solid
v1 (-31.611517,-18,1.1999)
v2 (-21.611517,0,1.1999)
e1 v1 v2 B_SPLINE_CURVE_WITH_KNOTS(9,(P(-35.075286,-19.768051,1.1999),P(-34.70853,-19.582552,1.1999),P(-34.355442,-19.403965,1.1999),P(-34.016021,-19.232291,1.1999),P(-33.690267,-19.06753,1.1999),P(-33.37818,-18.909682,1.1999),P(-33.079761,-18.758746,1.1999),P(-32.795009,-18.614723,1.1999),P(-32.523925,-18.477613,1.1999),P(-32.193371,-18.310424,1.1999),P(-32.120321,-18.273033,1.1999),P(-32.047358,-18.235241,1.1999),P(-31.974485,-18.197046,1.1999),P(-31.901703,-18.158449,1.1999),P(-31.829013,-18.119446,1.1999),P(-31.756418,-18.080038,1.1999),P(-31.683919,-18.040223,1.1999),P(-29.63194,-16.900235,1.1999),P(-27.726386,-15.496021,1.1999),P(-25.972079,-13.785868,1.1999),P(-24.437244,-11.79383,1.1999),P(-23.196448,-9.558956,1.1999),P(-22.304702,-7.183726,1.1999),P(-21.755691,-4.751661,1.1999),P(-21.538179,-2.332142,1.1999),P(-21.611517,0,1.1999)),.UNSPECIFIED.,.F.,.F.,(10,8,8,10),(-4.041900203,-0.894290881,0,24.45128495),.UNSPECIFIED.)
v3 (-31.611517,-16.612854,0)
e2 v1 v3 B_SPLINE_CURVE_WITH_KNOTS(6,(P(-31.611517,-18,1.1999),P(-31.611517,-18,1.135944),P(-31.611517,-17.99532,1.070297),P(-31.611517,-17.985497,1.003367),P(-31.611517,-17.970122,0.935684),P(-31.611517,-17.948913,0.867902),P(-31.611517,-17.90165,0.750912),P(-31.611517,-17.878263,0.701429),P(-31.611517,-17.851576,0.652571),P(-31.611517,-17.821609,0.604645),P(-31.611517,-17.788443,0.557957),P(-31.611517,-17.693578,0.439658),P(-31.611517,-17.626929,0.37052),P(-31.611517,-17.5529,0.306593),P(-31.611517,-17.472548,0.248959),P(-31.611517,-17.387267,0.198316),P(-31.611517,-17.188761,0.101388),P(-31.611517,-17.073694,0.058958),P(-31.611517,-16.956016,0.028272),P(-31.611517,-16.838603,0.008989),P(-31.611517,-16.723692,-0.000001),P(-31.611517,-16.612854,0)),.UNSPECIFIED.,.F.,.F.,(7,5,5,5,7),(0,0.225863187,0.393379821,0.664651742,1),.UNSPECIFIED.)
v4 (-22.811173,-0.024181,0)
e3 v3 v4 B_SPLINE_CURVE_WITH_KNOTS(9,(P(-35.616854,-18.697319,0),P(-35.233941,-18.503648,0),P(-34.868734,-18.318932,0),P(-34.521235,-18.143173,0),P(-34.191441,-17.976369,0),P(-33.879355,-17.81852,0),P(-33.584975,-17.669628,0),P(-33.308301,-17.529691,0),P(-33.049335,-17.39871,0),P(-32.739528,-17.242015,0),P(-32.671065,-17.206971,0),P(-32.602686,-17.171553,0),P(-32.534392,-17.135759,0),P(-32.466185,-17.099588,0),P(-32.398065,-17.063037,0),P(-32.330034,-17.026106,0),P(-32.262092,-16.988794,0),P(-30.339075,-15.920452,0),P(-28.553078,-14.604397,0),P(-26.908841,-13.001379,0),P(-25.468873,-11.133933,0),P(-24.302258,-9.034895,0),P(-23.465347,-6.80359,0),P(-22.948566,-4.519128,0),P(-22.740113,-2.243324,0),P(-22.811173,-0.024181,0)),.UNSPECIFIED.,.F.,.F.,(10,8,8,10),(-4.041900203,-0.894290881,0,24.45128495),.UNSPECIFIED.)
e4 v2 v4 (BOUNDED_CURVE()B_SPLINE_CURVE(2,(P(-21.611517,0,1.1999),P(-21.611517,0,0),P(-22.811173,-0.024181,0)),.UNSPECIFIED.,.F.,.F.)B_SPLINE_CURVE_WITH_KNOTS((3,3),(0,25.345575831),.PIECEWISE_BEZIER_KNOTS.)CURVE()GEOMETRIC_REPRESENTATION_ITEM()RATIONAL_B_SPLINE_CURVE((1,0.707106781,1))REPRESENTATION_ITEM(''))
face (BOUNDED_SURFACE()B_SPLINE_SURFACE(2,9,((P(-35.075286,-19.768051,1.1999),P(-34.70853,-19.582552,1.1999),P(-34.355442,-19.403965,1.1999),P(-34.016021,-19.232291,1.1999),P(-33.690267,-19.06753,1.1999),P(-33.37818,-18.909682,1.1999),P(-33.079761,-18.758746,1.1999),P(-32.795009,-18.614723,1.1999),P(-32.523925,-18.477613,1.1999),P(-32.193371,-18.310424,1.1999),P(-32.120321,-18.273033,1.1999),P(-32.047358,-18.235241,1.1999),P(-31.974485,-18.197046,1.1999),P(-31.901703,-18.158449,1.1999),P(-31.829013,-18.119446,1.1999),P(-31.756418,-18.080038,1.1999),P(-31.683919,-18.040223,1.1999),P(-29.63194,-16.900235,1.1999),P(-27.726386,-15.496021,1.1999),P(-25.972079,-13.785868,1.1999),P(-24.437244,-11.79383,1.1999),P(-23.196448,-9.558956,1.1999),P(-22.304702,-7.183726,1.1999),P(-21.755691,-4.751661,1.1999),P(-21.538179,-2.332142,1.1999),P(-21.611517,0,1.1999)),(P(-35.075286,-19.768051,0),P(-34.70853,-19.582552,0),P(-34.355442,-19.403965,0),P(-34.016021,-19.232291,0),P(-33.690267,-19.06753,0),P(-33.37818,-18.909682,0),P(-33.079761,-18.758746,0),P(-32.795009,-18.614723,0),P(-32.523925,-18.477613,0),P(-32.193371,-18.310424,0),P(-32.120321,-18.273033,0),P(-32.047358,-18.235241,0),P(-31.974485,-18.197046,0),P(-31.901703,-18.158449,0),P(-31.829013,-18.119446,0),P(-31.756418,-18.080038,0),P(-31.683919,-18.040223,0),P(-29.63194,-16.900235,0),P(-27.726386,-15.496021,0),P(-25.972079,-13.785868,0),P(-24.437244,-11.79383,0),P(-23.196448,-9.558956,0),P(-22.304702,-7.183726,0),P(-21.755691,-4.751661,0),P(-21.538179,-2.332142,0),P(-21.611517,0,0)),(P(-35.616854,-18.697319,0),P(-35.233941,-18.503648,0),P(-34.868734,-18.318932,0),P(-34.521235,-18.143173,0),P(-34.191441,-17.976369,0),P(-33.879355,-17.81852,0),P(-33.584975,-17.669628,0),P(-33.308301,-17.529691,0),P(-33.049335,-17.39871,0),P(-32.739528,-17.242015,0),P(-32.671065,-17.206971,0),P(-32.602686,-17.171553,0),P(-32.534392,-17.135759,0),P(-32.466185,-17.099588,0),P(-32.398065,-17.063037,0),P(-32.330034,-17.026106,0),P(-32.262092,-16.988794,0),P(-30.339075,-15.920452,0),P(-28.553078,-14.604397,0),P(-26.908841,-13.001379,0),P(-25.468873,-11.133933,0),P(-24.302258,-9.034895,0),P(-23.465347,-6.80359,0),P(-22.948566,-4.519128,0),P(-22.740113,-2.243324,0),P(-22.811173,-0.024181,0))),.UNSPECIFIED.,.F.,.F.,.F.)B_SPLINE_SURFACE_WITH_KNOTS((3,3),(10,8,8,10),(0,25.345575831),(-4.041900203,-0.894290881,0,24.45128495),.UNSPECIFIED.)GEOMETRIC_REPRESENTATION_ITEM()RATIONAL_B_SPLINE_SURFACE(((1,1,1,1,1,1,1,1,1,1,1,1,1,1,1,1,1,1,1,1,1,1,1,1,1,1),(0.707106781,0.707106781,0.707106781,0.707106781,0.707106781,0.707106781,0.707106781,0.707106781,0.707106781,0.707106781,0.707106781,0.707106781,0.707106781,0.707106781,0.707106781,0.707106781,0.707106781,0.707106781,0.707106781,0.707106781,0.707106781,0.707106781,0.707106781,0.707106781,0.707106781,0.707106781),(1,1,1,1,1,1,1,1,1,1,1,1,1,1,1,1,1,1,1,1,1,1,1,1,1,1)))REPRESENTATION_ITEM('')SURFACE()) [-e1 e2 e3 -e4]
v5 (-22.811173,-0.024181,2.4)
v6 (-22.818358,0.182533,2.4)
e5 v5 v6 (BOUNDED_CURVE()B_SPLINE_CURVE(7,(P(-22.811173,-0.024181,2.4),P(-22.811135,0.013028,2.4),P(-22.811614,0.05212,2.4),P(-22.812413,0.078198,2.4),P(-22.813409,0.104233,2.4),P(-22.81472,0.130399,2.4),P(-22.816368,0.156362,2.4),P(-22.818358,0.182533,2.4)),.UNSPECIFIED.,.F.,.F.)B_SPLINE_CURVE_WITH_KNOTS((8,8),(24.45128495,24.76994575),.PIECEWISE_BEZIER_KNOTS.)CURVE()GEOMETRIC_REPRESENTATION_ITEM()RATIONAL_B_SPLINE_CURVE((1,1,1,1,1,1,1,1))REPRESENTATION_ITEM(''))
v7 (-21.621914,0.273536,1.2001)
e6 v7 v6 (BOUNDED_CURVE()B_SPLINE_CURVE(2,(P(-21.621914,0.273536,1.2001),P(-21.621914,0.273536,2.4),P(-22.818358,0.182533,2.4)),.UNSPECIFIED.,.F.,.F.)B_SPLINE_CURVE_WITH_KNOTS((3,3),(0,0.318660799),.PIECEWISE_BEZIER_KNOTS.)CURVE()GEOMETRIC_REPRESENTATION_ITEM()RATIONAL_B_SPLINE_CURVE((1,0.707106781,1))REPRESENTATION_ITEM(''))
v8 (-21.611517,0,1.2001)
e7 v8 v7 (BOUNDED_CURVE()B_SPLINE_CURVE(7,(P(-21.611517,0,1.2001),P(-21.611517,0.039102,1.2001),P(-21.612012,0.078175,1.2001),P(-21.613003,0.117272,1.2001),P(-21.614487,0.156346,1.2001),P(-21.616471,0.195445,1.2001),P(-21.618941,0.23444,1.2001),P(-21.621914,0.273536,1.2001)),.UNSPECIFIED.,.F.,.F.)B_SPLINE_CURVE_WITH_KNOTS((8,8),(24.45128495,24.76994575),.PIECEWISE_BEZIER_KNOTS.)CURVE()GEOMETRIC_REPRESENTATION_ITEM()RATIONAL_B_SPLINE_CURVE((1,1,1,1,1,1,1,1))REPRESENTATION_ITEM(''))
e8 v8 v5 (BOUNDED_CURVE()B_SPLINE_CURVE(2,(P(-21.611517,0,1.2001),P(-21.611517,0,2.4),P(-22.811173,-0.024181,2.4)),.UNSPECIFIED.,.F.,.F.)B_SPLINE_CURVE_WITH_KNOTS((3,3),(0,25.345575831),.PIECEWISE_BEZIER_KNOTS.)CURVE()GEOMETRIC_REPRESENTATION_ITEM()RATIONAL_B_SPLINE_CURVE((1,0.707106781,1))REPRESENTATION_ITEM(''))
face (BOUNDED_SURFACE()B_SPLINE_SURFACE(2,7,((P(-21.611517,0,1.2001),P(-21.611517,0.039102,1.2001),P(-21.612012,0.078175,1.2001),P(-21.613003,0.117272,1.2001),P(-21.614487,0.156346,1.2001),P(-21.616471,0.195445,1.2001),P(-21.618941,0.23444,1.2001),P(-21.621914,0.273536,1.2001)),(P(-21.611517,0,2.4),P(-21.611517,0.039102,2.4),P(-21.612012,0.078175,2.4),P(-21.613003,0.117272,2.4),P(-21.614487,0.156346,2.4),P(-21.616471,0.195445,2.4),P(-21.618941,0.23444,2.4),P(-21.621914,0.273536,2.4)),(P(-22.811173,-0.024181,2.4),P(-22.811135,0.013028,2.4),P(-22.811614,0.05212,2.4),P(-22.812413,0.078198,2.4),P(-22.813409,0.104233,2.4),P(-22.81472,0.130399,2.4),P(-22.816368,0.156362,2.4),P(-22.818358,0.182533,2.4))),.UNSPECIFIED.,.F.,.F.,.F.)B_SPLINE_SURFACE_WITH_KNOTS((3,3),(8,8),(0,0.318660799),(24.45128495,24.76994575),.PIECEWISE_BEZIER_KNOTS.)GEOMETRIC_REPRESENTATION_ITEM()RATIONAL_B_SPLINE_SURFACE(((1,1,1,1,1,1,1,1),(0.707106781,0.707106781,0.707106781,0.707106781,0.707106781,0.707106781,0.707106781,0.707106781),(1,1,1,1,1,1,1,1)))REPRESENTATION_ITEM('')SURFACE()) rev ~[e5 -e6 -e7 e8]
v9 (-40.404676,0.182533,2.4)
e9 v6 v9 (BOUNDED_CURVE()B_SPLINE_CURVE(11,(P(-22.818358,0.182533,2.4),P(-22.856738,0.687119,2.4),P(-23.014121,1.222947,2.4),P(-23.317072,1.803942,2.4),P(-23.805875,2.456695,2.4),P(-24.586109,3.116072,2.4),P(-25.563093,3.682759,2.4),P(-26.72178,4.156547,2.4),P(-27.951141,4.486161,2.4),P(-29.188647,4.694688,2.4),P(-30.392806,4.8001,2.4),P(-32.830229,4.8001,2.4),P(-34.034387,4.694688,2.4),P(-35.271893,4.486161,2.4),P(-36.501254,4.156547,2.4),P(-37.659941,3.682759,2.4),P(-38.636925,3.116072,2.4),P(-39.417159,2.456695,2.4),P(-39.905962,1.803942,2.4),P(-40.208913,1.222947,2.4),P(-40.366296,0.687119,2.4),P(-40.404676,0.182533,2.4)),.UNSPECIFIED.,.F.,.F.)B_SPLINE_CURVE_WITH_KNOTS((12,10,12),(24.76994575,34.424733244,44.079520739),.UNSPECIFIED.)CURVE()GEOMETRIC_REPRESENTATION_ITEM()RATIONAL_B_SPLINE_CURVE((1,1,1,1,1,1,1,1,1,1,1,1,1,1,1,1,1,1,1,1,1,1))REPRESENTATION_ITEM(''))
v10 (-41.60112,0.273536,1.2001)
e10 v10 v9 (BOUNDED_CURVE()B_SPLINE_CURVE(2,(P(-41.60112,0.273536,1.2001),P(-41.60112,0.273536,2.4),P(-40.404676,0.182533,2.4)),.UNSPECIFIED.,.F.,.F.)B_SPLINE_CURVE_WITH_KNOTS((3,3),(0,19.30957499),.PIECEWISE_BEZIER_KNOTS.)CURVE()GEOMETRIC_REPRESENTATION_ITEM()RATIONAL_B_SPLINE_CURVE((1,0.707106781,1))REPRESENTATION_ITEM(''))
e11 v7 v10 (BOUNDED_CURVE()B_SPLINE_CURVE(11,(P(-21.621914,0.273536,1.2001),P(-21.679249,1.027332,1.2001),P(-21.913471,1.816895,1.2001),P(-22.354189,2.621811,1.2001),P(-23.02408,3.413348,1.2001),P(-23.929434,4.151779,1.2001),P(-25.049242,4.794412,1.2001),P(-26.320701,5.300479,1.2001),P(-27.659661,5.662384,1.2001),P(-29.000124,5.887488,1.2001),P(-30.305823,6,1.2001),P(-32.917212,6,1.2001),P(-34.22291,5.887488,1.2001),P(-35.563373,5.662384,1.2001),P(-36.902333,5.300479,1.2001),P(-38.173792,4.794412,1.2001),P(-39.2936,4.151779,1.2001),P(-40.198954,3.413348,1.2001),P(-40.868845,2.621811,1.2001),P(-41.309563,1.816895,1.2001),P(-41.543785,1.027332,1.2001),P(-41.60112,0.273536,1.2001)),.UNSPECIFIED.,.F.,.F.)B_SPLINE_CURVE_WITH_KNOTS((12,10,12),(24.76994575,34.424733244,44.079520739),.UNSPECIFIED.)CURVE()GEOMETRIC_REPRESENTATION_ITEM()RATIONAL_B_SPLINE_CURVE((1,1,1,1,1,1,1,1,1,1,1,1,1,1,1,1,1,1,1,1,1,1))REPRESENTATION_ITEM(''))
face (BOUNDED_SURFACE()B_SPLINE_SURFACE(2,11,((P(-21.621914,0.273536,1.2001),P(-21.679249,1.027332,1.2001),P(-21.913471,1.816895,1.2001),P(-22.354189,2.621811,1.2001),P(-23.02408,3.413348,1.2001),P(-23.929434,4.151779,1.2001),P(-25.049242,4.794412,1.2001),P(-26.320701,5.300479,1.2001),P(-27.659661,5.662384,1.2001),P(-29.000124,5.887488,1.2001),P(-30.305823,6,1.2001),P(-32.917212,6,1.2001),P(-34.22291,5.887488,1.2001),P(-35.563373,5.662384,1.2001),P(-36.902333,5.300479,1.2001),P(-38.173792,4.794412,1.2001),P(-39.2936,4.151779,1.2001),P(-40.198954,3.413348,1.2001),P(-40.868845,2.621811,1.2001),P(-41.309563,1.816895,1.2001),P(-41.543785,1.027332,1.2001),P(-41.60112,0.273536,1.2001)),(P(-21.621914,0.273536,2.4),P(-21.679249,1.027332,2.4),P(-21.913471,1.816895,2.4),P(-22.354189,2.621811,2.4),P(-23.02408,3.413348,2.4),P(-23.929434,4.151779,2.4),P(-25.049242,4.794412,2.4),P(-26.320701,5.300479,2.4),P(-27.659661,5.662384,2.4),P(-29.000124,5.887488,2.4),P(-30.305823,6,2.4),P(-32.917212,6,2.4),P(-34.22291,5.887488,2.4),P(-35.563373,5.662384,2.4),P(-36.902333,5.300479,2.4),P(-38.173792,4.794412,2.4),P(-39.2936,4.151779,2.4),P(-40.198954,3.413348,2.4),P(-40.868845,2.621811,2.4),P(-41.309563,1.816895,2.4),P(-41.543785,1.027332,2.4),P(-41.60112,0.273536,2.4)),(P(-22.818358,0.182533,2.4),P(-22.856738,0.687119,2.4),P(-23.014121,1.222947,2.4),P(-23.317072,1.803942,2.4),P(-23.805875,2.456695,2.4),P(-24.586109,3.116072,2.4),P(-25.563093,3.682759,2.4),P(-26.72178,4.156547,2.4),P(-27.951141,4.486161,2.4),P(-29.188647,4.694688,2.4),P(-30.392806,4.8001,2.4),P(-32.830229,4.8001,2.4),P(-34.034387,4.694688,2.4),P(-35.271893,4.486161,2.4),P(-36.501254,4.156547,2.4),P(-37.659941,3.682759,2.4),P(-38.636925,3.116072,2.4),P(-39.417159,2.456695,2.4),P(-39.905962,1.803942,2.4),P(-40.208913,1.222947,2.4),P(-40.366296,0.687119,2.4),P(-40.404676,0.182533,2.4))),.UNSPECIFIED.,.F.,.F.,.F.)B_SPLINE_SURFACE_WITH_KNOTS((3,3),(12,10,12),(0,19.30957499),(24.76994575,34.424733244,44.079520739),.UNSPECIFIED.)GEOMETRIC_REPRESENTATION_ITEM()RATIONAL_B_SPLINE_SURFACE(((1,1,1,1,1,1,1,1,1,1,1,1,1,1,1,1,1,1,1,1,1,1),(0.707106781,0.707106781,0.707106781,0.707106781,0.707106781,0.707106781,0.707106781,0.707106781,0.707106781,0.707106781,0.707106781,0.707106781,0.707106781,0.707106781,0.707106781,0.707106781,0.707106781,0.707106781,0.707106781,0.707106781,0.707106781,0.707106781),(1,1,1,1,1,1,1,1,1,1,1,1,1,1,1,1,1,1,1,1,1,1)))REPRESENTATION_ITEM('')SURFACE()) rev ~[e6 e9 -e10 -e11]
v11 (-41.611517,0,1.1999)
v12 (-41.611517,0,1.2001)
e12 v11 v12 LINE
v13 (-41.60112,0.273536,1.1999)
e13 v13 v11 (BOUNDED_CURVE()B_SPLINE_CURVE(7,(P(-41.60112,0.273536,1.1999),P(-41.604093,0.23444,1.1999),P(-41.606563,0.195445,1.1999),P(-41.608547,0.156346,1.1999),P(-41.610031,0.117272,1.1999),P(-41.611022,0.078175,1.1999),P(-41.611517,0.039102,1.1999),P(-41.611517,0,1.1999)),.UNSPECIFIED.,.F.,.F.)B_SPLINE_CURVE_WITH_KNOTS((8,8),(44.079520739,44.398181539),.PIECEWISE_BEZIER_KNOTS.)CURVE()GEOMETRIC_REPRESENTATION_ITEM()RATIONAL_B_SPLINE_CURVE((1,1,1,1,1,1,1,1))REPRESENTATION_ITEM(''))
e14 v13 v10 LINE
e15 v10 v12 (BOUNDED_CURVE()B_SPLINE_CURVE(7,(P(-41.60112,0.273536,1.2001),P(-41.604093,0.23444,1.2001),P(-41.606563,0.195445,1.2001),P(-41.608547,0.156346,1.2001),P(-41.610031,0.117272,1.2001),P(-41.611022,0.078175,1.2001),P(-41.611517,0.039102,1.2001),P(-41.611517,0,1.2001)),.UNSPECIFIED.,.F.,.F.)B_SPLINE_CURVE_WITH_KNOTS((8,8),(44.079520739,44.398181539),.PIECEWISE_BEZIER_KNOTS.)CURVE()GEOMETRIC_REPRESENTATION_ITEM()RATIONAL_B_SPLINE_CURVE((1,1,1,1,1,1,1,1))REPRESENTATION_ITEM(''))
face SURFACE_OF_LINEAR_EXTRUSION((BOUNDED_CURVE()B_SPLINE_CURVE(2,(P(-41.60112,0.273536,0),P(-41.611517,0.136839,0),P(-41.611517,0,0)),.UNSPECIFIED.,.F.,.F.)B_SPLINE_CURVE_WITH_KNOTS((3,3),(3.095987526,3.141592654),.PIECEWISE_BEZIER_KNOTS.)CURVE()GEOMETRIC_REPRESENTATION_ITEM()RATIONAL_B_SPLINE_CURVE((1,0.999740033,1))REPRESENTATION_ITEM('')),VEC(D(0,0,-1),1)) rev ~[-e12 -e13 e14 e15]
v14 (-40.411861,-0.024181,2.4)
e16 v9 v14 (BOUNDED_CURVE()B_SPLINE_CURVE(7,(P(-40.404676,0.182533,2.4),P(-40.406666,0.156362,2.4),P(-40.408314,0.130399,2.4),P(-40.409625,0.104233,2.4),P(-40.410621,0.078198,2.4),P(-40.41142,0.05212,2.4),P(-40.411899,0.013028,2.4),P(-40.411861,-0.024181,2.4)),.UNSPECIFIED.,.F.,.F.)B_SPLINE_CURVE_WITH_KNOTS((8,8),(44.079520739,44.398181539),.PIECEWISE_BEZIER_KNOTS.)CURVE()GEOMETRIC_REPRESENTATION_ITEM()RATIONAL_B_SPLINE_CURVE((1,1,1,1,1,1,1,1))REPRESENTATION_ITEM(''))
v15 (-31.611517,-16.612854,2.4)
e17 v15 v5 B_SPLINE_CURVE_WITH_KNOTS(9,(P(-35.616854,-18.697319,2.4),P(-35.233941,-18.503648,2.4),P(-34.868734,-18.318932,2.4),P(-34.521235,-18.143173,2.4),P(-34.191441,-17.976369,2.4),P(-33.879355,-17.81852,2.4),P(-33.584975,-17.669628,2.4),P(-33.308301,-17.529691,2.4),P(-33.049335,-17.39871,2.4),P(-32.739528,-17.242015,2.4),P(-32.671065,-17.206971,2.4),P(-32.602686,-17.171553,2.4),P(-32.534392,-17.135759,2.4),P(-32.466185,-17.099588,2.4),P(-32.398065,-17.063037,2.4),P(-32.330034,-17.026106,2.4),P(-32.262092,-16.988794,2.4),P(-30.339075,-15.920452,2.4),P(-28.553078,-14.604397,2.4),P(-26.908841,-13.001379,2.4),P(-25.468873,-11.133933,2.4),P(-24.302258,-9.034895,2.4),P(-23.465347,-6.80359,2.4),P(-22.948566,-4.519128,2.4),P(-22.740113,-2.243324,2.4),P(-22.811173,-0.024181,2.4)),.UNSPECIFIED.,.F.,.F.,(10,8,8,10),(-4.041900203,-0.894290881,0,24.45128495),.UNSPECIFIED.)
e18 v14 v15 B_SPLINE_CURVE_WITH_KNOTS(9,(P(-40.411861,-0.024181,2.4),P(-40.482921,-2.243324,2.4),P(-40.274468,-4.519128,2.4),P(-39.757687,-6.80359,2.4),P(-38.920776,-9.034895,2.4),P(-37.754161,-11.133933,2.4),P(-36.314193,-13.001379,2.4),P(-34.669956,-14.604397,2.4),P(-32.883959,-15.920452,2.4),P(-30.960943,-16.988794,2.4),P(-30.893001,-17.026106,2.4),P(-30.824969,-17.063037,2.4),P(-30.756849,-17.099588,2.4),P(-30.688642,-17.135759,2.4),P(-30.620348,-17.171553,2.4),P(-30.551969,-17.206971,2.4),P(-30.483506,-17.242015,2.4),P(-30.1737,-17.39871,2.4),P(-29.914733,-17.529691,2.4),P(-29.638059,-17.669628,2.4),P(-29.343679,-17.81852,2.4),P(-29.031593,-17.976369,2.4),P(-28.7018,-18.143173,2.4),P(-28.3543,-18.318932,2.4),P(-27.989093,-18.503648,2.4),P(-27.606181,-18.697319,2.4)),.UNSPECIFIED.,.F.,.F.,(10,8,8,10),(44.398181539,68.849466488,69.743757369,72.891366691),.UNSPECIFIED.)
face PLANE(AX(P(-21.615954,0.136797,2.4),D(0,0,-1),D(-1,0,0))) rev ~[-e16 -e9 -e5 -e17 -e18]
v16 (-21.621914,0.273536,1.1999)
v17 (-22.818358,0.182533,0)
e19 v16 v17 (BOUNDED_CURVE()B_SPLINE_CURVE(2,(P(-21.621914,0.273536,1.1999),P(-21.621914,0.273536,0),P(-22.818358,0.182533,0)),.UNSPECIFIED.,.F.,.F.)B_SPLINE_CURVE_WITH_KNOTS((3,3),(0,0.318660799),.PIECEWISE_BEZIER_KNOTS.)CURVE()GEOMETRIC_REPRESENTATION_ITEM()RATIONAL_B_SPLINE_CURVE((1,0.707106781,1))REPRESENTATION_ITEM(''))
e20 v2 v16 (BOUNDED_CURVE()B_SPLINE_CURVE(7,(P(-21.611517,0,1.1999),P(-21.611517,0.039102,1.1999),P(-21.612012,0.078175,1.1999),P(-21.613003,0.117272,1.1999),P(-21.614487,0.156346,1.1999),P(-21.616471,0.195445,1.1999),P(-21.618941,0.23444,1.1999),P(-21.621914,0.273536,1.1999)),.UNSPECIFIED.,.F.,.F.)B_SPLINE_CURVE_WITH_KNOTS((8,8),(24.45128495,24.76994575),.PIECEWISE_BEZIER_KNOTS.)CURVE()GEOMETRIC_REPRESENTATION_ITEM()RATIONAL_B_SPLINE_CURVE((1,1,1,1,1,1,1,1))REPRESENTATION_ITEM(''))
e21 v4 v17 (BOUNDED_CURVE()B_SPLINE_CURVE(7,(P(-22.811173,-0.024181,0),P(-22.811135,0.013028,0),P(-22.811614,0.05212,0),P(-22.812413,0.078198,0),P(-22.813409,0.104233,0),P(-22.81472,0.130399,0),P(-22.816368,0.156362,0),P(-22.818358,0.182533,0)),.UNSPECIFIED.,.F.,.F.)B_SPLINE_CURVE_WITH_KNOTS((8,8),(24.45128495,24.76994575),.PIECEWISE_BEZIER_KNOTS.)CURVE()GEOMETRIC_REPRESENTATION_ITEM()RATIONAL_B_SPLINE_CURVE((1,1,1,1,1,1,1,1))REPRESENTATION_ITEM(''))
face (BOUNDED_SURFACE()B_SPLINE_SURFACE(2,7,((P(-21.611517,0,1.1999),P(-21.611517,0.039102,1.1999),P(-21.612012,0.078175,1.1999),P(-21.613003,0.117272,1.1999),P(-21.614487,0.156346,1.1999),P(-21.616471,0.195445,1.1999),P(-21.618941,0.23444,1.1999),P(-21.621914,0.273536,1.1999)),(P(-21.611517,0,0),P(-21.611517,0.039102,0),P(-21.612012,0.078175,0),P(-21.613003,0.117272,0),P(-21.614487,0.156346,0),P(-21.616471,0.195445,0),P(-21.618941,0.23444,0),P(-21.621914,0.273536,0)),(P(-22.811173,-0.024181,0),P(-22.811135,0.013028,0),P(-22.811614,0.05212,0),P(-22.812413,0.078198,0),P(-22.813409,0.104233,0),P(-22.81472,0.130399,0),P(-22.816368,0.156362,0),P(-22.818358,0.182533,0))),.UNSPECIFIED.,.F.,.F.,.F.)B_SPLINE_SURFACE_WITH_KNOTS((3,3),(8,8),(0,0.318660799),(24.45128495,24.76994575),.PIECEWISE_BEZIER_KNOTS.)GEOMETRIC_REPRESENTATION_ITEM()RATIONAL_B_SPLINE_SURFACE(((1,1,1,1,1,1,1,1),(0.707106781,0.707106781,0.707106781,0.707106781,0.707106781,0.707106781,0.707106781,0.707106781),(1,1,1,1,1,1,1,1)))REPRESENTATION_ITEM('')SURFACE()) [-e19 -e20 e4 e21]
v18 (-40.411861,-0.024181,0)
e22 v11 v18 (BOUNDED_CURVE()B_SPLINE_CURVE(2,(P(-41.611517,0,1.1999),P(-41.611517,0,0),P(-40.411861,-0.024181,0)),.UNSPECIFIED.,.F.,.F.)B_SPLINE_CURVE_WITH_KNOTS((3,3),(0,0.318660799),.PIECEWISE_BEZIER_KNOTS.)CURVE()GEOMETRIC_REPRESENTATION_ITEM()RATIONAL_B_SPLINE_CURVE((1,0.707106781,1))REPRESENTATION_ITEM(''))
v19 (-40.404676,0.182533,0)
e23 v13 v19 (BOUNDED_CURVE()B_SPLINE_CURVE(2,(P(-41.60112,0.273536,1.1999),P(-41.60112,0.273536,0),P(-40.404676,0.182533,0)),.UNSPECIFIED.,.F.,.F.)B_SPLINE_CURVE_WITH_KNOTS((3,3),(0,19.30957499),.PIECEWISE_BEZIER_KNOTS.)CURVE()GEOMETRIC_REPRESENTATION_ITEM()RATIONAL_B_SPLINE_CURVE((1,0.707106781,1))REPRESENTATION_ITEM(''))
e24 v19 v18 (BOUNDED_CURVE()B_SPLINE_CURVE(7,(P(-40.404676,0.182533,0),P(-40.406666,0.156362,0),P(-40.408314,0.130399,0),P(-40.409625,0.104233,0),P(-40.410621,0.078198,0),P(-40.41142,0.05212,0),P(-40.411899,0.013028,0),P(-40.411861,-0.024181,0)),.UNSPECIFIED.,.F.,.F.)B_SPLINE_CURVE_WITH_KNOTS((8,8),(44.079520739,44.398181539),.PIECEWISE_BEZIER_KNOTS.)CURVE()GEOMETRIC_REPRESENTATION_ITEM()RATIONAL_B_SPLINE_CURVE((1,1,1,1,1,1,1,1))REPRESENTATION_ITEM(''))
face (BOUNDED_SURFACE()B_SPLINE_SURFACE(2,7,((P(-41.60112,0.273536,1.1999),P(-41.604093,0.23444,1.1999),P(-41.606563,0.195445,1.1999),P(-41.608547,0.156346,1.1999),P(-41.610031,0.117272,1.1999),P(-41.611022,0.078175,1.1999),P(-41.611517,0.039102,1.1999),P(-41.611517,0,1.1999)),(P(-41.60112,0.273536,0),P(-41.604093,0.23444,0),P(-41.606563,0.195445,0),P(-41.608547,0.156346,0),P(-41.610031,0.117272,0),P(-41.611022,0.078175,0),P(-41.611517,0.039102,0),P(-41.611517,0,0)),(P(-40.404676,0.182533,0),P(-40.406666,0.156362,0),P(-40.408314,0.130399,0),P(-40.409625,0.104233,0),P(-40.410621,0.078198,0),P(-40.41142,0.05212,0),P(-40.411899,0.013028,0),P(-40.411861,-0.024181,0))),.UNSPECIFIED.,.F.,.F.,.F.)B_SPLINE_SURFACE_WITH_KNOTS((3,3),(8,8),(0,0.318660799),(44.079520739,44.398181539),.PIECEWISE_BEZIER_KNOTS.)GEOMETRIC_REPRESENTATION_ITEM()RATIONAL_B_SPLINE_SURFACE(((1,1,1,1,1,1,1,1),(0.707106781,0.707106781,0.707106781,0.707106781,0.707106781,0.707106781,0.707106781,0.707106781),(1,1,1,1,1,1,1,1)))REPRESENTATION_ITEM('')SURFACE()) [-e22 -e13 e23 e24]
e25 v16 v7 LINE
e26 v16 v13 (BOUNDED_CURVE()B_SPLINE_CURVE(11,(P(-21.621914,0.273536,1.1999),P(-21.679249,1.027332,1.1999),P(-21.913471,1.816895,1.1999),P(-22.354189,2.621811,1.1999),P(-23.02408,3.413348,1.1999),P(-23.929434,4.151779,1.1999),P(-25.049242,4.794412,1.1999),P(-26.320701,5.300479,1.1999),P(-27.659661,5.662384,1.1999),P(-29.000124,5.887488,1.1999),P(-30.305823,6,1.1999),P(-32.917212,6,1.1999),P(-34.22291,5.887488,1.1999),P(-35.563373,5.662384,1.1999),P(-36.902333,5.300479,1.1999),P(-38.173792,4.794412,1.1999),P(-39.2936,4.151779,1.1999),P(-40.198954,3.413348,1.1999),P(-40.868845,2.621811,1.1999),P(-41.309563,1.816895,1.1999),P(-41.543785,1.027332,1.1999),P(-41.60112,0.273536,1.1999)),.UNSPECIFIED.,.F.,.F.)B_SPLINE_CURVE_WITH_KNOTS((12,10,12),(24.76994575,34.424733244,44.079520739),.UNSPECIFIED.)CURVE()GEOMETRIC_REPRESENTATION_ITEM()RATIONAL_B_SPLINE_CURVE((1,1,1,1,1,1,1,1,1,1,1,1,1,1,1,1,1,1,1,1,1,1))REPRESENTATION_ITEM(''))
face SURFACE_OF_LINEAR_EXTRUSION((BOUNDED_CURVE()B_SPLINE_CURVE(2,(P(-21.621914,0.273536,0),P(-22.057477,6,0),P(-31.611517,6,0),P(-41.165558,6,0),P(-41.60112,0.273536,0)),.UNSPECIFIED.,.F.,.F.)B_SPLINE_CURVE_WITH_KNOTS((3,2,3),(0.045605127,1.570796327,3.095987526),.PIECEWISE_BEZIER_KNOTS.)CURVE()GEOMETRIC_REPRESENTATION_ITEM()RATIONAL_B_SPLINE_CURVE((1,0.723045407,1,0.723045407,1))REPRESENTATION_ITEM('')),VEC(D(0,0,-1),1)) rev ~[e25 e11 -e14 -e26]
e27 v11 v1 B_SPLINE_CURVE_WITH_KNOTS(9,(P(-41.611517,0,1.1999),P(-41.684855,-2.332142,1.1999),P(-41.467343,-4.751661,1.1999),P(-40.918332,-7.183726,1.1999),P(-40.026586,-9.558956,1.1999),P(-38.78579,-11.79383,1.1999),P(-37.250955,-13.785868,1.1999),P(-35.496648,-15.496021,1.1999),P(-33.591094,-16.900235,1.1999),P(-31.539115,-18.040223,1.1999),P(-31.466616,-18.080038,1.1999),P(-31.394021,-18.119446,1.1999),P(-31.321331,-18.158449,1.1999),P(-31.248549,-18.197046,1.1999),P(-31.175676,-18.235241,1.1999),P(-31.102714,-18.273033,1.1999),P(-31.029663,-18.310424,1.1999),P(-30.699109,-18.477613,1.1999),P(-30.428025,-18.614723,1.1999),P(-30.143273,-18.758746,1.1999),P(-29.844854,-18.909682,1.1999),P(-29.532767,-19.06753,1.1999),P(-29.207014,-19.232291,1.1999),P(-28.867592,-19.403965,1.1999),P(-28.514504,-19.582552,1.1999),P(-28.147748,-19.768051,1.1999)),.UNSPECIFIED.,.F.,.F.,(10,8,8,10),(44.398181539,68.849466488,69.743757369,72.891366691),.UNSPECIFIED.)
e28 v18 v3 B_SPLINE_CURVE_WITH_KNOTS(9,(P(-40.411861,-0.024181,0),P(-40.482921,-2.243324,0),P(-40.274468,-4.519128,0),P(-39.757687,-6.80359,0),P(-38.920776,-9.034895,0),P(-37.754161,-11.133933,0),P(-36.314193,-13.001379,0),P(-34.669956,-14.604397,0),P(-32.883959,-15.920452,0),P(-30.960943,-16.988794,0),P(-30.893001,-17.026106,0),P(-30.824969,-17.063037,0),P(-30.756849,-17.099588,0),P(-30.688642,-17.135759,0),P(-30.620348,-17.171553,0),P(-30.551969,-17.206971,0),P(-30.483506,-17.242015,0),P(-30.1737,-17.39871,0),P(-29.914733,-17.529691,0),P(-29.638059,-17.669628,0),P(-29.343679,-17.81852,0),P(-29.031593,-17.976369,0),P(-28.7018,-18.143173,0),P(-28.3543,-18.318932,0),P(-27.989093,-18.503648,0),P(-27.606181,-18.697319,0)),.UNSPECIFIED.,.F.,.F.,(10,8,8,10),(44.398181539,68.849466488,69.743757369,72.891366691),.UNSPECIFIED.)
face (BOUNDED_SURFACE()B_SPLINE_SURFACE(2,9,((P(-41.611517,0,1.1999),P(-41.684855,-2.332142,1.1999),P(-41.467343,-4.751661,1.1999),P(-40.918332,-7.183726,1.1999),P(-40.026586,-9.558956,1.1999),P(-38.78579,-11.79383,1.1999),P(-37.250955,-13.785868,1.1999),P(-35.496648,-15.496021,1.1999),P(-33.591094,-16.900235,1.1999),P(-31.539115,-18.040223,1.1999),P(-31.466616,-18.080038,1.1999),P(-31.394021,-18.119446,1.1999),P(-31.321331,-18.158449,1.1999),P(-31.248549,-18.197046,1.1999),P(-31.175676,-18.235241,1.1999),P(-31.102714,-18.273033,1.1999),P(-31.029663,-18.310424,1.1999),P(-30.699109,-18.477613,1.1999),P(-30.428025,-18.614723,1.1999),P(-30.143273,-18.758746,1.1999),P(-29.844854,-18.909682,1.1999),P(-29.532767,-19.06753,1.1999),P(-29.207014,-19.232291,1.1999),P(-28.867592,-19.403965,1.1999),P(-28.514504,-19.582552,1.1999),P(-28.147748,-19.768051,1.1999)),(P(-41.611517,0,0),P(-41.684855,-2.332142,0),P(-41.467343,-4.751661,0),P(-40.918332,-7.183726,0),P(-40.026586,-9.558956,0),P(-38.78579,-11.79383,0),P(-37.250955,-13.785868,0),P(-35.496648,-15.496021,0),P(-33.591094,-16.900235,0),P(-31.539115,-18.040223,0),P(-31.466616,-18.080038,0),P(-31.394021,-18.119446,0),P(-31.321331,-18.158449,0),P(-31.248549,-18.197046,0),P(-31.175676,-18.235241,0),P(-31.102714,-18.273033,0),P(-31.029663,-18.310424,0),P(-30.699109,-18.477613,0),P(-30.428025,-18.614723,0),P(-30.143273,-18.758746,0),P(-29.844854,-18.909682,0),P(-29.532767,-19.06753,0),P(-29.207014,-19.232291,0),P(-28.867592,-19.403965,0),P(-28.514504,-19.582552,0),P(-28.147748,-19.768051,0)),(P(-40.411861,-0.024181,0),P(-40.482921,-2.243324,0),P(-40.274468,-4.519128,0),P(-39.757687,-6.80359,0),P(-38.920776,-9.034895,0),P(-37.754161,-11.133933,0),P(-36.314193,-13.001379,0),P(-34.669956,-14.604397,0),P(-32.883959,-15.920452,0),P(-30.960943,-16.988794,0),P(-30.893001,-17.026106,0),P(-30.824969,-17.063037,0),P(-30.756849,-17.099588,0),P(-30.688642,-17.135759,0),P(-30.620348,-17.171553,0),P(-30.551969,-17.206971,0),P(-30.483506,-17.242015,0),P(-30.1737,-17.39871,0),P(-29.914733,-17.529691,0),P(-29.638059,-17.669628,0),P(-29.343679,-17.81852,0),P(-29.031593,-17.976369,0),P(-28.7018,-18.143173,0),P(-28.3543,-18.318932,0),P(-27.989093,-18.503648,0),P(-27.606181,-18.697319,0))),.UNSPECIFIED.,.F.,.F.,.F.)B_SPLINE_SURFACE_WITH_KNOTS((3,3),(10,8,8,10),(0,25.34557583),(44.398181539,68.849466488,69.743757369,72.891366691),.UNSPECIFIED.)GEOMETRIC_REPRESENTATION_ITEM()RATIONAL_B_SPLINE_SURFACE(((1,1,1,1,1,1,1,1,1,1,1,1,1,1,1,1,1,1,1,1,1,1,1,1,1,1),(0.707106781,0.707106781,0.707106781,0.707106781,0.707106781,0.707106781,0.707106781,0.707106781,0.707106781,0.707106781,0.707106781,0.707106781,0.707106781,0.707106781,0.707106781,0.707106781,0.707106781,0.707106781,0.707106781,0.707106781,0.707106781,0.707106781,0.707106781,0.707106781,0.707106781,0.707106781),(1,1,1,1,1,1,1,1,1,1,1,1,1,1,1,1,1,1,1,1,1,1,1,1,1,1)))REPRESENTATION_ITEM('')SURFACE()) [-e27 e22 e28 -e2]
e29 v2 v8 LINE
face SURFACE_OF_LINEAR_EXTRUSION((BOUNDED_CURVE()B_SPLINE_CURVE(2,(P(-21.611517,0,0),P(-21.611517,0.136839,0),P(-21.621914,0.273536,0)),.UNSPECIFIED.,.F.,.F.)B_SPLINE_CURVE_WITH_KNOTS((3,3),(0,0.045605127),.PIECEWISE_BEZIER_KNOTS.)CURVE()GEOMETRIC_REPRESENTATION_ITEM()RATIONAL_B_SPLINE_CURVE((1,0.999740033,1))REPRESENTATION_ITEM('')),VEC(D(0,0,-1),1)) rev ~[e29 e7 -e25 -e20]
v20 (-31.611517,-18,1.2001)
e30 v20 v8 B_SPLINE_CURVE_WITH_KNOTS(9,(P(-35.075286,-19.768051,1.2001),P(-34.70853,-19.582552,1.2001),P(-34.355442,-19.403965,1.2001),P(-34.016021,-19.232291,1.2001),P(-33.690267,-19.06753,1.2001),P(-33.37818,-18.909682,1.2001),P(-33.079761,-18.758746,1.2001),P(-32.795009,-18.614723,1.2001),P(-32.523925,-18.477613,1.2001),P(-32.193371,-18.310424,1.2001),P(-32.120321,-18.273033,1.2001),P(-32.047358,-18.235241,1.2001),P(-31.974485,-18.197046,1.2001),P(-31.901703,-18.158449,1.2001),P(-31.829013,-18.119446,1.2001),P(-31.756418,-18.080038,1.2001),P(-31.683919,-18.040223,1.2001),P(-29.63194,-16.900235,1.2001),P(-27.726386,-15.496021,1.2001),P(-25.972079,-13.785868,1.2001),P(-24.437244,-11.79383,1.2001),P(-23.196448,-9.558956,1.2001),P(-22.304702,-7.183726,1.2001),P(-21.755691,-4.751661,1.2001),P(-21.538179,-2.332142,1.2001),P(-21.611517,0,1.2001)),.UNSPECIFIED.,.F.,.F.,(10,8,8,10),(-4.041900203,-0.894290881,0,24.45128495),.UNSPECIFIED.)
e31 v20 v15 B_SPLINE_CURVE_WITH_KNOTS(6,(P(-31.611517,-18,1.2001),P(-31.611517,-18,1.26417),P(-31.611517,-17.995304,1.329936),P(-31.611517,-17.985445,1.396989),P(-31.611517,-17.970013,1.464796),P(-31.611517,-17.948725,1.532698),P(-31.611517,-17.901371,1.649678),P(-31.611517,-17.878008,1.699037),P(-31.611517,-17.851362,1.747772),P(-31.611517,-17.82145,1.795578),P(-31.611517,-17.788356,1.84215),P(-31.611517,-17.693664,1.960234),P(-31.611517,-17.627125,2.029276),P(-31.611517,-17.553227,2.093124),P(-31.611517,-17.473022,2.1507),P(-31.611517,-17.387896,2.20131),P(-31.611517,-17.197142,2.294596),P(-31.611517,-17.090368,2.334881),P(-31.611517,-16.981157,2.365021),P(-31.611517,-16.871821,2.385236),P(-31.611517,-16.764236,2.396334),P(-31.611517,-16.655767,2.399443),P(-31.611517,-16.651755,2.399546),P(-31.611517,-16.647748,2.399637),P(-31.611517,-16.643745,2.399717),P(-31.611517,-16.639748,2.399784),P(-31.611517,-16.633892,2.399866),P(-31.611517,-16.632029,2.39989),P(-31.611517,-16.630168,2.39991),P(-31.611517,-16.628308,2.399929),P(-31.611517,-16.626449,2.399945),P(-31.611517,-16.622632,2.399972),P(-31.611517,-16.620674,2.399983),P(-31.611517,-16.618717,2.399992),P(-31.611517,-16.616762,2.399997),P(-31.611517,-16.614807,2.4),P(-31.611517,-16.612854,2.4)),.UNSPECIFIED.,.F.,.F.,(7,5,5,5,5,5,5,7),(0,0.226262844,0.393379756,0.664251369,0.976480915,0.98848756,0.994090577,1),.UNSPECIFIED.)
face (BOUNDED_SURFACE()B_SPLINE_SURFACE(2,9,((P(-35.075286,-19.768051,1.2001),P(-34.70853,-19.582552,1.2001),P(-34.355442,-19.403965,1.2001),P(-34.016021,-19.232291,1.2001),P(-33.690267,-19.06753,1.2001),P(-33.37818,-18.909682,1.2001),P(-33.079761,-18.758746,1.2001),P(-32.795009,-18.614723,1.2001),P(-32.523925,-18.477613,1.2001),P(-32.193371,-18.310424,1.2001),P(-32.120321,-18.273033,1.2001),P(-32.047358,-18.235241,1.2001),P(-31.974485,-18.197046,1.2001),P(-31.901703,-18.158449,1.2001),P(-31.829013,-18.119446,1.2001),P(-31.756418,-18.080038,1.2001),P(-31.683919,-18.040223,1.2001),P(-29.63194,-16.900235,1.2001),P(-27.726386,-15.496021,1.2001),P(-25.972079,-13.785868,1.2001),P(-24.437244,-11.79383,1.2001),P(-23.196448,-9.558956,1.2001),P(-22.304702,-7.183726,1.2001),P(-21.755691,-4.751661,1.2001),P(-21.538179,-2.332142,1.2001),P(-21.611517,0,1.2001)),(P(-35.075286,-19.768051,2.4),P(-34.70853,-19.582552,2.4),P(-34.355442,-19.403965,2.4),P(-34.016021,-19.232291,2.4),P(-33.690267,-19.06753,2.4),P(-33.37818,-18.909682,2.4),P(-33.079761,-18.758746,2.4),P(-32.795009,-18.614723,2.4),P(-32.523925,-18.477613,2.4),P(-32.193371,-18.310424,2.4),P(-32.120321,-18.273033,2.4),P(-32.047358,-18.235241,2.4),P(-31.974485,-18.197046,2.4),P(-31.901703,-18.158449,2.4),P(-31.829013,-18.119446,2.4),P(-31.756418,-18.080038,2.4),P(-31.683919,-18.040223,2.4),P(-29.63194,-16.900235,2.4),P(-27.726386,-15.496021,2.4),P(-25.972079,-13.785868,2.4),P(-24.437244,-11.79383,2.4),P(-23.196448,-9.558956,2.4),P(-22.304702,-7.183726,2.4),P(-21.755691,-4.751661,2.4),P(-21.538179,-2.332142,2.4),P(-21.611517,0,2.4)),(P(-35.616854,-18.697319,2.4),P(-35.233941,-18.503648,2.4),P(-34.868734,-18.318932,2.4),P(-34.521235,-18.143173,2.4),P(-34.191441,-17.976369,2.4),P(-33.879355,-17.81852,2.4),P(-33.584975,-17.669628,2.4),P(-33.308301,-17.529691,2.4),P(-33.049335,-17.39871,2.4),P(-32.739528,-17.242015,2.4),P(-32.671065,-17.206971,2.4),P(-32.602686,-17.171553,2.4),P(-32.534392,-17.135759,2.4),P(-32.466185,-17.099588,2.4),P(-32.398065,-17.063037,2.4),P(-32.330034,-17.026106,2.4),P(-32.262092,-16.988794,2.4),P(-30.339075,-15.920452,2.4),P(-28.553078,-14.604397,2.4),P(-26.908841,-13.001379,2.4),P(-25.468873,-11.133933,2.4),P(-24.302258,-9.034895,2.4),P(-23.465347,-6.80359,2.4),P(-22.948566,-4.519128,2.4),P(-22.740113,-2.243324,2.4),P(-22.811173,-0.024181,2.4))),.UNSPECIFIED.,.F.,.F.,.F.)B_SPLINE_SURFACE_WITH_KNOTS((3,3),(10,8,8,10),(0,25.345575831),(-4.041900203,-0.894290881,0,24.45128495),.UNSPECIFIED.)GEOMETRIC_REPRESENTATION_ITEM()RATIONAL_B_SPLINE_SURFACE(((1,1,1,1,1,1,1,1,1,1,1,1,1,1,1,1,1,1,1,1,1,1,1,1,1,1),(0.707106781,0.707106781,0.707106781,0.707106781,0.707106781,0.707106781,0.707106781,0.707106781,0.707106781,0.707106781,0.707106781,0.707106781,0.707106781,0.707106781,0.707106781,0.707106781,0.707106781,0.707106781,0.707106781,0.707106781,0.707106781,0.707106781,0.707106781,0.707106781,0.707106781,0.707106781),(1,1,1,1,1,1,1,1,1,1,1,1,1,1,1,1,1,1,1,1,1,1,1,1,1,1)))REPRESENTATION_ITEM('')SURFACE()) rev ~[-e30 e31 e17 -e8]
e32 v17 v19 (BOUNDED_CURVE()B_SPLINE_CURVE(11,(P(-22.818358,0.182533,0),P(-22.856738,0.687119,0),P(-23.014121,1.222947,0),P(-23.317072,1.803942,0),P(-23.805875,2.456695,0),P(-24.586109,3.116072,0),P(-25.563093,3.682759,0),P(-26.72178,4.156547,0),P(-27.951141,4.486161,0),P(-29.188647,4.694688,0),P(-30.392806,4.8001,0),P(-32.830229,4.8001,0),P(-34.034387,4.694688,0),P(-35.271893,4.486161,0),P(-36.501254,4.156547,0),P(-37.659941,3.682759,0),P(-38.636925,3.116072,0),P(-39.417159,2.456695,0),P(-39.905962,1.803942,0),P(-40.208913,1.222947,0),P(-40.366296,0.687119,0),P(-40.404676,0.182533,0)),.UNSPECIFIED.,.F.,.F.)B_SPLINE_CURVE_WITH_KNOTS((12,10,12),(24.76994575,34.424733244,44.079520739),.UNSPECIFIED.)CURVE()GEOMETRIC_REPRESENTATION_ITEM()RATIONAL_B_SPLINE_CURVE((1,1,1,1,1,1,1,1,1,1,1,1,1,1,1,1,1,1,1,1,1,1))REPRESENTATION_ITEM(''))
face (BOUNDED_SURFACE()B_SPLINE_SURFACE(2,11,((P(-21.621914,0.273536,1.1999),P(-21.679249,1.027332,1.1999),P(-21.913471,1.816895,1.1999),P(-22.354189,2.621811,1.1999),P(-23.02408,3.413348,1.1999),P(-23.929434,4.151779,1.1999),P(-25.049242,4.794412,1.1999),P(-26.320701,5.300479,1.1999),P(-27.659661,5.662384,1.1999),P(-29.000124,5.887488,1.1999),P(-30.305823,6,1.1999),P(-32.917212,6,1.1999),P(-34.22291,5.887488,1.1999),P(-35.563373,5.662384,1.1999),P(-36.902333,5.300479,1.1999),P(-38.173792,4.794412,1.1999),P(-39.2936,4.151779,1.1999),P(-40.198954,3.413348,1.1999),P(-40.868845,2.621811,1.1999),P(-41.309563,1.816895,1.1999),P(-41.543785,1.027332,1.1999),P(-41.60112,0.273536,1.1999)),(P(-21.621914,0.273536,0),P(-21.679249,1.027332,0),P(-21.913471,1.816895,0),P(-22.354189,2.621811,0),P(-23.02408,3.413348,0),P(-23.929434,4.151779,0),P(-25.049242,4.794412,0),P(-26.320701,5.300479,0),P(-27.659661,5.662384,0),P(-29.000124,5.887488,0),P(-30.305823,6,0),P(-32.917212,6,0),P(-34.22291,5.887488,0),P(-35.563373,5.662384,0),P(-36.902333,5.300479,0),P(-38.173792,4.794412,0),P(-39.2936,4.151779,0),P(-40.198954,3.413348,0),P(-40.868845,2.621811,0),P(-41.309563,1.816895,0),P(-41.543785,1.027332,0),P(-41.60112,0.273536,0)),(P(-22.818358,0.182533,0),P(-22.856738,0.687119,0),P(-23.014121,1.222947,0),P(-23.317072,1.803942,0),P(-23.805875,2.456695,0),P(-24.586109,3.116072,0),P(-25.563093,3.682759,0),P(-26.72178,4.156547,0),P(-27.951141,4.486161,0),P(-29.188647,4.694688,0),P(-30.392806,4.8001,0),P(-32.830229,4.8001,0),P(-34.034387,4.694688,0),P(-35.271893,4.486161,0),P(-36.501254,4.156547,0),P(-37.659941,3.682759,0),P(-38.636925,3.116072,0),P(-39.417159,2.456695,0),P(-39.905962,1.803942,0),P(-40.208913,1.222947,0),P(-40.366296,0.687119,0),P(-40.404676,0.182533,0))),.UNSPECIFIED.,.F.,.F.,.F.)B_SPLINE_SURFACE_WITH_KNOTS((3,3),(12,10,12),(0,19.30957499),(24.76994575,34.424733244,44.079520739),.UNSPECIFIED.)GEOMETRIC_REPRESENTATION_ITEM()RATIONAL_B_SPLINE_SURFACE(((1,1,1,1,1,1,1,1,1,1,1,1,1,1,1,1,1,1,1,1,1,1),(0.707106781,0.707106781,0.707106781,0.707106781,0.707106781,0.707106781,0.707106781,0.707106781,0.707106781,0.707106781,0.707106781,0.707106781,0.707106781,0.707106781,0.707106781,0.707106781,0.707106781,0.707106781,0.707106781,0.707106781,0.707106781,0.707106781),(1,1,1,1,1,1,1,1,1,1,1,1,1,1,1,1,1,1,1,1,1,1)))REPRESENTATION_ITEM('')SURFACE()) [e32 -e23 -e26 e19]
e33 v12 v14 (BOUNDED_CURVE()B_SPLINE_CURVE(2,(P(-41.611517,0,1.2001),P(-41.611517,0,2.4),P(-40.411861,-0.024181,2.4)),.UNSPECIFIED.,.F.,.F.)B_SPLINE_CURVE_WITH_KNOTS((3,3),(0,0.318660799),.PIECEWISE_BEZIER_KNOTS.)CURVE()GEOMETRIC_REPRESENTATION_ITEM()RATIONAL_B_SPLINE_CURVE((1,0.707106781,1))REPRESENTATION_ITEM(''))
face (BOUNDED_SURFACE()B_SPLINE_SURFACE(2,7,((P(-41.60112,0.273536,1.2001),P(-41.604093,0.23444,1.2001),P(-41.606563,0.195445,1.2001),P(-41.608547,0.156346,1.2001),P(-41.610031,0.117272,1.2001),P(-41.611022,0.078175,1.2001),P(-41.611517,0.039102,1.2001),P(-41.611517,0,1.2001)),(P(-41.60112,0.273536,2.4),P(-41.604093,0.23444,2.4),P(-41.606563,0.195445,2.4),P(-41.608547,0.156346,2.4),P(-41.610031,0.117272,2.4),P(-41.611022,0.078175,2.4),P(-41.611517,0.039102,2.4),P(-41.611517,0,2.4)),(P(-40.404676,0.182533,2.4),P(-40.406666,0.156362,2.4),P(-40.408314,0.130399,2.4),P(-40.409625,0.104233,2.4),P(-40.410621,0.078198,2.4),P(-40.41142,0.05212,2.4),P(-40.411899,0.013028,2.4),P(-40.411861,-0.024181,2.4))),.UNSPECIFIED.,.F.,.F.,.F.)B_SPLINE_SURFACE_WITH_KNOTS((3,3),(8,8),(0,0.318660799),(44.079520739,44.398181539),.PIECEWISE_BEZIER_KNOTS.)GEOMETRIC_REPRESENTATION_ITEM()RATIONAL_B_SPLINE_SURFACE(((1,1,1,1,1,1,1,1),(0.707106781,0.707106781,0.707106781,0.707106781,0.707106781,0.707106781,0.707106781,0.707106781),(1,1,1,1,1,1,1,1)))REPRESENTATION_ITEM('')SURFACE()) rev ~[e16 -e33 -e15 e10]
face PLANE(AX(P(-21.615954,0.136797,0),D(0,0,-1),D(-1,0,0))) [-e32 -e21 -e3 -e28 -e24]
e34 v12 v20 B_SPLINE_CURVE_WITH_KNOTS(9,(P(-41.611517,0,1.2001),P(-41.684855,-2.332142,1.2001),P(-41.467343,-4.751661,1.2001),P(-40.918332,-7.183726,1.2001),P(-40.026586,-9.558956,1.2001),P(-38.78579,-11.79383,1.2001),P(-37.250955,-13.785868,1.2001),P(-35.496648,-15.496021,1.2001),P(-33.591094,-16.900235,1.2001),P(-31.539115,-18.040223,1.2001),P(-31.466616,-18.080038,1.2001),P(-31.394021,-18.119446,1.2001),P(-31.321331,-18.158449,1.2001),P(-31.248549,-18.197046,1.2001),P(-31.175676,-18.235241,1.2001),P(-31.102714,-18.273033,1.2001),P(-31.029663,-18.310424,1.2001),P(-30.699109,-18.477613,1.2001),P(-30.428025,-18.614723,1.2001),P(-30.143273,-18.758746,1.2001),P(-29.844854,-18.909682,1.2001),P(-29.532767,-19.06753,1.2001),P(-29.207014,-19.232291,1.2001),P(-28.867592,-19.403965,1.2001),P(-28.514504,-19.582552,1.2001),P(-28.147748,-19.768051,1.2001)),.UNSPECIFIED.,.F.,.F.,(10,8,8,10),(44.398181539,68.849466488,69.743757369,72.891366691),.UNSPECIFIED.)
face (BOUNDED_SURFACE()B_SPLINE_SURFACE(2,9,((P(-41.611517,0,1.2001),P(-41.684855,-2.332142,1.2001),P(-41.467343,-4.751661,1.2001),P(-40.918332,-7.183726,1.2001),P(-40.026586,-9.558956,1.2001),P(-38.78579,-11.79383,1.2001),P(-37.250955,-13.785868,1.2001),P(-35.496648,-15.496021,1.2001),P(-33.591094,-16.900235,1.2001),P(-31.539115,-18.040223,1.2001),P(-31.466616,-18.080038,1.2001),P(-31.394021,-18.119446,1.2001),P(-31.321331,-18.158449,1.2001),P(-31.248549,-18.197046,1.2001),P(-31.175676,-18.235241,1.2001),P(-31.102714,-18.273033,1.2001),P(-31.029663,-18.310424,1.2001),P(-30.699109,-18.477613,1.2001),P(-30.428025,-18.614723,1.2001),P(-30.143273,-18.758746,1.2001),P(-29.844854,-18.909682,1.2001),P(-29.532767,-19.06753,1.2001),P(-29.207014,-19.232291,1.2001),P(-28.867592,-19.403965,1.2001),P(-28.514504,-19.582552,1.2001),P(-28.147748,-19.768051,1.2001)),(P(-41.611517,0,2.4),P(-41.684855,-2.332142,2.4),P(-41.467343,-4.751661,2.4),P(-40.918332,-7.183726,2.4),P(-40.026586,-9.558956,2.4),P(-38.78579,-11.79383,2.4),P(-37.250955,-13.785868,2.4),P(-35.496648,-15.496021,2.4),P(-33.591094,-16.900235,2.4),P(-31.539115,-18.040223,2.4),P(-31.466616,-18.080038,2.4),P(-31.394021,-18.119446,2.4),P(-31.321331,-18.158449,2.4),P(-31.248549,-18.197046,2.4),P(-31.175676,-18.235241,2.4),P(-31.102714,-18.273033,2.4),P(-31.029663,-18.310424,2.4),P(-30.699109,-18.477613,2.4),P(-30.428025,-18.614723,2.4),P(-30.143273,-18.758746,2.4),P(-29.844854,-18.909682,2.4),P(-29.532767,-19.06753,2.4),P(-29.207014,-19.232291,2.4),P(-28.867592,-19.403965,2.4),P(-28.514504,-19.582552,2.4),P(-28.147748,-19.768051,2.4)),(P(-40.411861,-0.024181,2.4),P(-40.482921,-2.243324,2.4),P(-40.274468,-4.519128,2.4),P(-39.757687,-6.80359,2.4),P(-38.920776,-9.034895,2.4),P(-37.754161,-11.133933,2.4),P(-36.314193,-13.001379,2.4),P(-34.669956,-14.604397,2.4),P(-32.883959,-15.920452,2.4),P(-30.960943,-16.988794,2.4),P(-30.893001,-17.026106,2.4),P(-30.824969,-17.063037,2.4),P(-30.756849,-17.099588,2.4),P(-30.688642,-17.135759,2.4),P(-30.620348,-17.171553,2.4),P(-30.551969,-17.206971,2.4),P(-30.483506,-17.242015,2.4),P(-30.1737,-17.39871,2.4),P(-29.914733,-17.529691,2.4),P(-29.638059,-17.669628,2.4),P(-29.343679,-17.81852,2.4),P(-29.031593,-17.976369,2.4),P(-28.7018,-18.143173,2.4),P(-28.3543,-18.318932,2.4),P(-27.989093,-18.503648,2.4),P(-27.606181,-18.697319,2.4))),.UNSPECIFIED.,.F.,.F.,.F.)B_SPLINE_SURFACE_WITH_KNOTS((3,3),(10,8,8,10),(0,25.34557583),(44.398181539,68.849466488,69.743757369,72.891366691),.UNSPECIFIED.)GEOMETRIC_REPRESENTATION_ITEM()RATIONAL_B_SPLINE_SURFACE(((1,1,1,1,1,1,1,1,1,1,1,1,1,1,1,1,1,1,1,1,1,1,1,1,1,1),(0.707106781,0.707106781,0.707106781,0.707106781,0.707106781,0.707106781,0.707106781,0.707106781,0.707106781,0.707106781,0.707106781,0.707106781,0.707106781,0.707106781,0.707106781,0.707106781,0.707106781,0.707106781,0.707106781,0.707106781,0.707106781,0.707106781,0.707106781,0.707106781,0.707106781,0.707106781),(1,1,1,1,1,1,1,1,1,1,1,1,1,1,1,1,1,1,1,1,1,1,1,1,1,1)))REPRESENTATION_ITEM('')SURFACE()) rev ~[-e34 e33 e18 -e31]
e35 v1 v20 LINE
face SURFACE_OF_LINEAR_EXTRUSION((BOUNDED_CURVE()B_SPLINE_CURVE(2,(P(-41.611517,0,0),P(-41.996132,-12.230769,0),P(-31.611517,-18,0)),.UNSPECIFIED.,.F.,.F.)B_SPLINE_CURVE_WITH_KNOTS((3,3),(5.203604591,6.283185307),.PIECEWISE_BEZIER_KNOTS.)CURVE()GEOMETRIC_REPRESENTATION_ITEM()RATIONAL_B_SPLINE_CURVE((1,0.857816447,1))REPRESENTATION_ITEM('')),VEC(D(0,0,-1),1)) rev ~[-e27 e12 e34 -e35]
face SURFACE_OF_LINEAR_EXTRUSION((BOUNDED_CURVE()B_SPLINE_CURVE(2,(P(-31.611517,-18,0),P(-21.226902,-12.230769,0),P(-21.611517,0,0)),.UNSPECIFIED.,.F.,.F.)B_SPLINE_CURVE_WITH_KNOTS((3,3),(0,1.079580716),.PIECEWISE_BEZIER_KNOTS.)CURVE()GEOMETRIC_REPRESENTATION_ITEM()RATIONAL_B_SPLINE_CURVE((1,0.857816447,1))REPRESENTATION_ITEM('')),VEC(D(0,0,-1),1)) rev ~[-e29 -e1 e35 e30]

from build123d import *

# Parameters (mm, degrees)
F1_DEPTH = 2.4
F2_R     = 1.1999


# Not quite as in the source:
# - a fillet or chamfer is up to 0.001 mm smaller than in the source, because OpenCascade refuses the exact size


with BuildPart() as f1:
    # F0 (on Top) → F1 (new body)
    with BuildSketch(Plane.XY):
        with BuildLine():
            add(Edge.make_bspline(
                [(-21.6115170717, 0), (-21.6158181441, 0.1367741011), (-21.6219144077, 0.2735359227)],
                knots=[1.0795807164, 1.0795807164, 1.0795807164, 1.0929807321, 1.0929807321, 1.0929807321], degree=2, weights=[1, 0.999977555, 1]))
            add(Edge.make_bspline(
                [(-21.6115170717, 0), (-21.6115170717, 0.1368390995), (-21.6219144077, 0.2735359227)],
                knots=[0, 0, 0, 0.0456051273, 0.0456051273, 0.0456051273], degree=2, weights=[1, 0.9997400328, 1]))
        make_face()
        with BuildLine():
            add(Edge.make_bspline(
                [(-31.6115170717, -18), (-21.2269016871, -12.2307692308), (-21.6115170717, 0)],
                knots=[0, 0, 0, 1.0795807164, 1.0795807164, 1.0795807164], degree=2, weights=[1, 0.8578164469, 1]))
            add(Edge.make_bspline(
                [(-21.6115170717, 0), (-21.6158181441, 0.1367741011), (-21.6219144077, 0.2735359227)],
                knots=[1.0795807164, 1.0795807164, 1.0795807164, 1.0929807321, 1.0929807321, 1.0929807321], degree=2, weights=[1, 0.999977555, 1]))
            add(Edge.make_bspline(
                [(-21.6219144077, 0.2735359227), (-22.0574766194, 6), (-31.6115170717, 6), (-41.165557524, 6), (-41.6011197358, 0.2735359227)],
                knots=[0.0456051273, 0.0456051273, 0.0456051273, 1.5707963268, 1.5707963268, 3.0959875263, 3.0959875263, 3.0959875263], degree=2, weights=[1, 0.7230454068, 1, 0.7230454068, 1]))
            add(Edge.make_bspline(
                [(-41.6011197358, 0.2735359227), (-41.6072159994, 0.1367741011), (-41.6115170717, 0)],
                knots=[5.1902045751, 5.1902045751, 5.1902045751, 5.2036045908, 5.2036045908, 5.2036045908], degree=2, weights=[1, 0.999977555, 1]))
            add(Edge.make_bspline(
                [(-41.6115170717, 0), (-41.9961324563, -12.2307692308), (-31.6115170717, -18)],
                knots=[5.2036045908, 5.2036045908, 5.2036045908, 6.2831853072, 6.2831853072, 6.2831853072], degree=2, weights=[1, 0.8578164469, 1]))
        make_face()
        with BuildLine():
            add(Edge.make_bspline(
                [(-41.6011197358, 0.2735359227), (-41.6072159994, 0.1367741011), (-41.6115170717, 0)],
                knots=[5.1902045751, 5.1902045751, 5.1902045751, 5.2036045908, 5.2036045908, 5.2036045908], degree=2, weights=[1, 0.999977555, 1]))
            add(Edge.make_bspline(
                [(-41.6011197358, 0.2735359227), (-41.6115170717, 0.1368390995), (-41.6115170717, 0)],
                knots=[3.0959875263, 3.0959875263, 3.0959875263, 3.1415926536, 3.1415926536, 3.1415926536], degree=2, weights=[1, 0.9997400328, 1]))
        make_face()
    extrude(amount=F1_DEPTH)

    # F2 (radius 1.2 in the source; OpenCascade refuses exactly that, so slightly less here)
    f2_edges = [f1.edges().sort_by_distance(p)[0] for p in [
        (-31.611517, 6, 2.4),
        (-24.081962, -10.413403, 2.4),
        (-39.141072, -10.413403, 2.4),
        (-31.611517, 6, 0),
        (-24.081962, -10.413403, 0),
        (-39.141072, -10.413403, 0),
    ]]
    fillet(f2_edges, radius=F2_R)


solid = f1.part
